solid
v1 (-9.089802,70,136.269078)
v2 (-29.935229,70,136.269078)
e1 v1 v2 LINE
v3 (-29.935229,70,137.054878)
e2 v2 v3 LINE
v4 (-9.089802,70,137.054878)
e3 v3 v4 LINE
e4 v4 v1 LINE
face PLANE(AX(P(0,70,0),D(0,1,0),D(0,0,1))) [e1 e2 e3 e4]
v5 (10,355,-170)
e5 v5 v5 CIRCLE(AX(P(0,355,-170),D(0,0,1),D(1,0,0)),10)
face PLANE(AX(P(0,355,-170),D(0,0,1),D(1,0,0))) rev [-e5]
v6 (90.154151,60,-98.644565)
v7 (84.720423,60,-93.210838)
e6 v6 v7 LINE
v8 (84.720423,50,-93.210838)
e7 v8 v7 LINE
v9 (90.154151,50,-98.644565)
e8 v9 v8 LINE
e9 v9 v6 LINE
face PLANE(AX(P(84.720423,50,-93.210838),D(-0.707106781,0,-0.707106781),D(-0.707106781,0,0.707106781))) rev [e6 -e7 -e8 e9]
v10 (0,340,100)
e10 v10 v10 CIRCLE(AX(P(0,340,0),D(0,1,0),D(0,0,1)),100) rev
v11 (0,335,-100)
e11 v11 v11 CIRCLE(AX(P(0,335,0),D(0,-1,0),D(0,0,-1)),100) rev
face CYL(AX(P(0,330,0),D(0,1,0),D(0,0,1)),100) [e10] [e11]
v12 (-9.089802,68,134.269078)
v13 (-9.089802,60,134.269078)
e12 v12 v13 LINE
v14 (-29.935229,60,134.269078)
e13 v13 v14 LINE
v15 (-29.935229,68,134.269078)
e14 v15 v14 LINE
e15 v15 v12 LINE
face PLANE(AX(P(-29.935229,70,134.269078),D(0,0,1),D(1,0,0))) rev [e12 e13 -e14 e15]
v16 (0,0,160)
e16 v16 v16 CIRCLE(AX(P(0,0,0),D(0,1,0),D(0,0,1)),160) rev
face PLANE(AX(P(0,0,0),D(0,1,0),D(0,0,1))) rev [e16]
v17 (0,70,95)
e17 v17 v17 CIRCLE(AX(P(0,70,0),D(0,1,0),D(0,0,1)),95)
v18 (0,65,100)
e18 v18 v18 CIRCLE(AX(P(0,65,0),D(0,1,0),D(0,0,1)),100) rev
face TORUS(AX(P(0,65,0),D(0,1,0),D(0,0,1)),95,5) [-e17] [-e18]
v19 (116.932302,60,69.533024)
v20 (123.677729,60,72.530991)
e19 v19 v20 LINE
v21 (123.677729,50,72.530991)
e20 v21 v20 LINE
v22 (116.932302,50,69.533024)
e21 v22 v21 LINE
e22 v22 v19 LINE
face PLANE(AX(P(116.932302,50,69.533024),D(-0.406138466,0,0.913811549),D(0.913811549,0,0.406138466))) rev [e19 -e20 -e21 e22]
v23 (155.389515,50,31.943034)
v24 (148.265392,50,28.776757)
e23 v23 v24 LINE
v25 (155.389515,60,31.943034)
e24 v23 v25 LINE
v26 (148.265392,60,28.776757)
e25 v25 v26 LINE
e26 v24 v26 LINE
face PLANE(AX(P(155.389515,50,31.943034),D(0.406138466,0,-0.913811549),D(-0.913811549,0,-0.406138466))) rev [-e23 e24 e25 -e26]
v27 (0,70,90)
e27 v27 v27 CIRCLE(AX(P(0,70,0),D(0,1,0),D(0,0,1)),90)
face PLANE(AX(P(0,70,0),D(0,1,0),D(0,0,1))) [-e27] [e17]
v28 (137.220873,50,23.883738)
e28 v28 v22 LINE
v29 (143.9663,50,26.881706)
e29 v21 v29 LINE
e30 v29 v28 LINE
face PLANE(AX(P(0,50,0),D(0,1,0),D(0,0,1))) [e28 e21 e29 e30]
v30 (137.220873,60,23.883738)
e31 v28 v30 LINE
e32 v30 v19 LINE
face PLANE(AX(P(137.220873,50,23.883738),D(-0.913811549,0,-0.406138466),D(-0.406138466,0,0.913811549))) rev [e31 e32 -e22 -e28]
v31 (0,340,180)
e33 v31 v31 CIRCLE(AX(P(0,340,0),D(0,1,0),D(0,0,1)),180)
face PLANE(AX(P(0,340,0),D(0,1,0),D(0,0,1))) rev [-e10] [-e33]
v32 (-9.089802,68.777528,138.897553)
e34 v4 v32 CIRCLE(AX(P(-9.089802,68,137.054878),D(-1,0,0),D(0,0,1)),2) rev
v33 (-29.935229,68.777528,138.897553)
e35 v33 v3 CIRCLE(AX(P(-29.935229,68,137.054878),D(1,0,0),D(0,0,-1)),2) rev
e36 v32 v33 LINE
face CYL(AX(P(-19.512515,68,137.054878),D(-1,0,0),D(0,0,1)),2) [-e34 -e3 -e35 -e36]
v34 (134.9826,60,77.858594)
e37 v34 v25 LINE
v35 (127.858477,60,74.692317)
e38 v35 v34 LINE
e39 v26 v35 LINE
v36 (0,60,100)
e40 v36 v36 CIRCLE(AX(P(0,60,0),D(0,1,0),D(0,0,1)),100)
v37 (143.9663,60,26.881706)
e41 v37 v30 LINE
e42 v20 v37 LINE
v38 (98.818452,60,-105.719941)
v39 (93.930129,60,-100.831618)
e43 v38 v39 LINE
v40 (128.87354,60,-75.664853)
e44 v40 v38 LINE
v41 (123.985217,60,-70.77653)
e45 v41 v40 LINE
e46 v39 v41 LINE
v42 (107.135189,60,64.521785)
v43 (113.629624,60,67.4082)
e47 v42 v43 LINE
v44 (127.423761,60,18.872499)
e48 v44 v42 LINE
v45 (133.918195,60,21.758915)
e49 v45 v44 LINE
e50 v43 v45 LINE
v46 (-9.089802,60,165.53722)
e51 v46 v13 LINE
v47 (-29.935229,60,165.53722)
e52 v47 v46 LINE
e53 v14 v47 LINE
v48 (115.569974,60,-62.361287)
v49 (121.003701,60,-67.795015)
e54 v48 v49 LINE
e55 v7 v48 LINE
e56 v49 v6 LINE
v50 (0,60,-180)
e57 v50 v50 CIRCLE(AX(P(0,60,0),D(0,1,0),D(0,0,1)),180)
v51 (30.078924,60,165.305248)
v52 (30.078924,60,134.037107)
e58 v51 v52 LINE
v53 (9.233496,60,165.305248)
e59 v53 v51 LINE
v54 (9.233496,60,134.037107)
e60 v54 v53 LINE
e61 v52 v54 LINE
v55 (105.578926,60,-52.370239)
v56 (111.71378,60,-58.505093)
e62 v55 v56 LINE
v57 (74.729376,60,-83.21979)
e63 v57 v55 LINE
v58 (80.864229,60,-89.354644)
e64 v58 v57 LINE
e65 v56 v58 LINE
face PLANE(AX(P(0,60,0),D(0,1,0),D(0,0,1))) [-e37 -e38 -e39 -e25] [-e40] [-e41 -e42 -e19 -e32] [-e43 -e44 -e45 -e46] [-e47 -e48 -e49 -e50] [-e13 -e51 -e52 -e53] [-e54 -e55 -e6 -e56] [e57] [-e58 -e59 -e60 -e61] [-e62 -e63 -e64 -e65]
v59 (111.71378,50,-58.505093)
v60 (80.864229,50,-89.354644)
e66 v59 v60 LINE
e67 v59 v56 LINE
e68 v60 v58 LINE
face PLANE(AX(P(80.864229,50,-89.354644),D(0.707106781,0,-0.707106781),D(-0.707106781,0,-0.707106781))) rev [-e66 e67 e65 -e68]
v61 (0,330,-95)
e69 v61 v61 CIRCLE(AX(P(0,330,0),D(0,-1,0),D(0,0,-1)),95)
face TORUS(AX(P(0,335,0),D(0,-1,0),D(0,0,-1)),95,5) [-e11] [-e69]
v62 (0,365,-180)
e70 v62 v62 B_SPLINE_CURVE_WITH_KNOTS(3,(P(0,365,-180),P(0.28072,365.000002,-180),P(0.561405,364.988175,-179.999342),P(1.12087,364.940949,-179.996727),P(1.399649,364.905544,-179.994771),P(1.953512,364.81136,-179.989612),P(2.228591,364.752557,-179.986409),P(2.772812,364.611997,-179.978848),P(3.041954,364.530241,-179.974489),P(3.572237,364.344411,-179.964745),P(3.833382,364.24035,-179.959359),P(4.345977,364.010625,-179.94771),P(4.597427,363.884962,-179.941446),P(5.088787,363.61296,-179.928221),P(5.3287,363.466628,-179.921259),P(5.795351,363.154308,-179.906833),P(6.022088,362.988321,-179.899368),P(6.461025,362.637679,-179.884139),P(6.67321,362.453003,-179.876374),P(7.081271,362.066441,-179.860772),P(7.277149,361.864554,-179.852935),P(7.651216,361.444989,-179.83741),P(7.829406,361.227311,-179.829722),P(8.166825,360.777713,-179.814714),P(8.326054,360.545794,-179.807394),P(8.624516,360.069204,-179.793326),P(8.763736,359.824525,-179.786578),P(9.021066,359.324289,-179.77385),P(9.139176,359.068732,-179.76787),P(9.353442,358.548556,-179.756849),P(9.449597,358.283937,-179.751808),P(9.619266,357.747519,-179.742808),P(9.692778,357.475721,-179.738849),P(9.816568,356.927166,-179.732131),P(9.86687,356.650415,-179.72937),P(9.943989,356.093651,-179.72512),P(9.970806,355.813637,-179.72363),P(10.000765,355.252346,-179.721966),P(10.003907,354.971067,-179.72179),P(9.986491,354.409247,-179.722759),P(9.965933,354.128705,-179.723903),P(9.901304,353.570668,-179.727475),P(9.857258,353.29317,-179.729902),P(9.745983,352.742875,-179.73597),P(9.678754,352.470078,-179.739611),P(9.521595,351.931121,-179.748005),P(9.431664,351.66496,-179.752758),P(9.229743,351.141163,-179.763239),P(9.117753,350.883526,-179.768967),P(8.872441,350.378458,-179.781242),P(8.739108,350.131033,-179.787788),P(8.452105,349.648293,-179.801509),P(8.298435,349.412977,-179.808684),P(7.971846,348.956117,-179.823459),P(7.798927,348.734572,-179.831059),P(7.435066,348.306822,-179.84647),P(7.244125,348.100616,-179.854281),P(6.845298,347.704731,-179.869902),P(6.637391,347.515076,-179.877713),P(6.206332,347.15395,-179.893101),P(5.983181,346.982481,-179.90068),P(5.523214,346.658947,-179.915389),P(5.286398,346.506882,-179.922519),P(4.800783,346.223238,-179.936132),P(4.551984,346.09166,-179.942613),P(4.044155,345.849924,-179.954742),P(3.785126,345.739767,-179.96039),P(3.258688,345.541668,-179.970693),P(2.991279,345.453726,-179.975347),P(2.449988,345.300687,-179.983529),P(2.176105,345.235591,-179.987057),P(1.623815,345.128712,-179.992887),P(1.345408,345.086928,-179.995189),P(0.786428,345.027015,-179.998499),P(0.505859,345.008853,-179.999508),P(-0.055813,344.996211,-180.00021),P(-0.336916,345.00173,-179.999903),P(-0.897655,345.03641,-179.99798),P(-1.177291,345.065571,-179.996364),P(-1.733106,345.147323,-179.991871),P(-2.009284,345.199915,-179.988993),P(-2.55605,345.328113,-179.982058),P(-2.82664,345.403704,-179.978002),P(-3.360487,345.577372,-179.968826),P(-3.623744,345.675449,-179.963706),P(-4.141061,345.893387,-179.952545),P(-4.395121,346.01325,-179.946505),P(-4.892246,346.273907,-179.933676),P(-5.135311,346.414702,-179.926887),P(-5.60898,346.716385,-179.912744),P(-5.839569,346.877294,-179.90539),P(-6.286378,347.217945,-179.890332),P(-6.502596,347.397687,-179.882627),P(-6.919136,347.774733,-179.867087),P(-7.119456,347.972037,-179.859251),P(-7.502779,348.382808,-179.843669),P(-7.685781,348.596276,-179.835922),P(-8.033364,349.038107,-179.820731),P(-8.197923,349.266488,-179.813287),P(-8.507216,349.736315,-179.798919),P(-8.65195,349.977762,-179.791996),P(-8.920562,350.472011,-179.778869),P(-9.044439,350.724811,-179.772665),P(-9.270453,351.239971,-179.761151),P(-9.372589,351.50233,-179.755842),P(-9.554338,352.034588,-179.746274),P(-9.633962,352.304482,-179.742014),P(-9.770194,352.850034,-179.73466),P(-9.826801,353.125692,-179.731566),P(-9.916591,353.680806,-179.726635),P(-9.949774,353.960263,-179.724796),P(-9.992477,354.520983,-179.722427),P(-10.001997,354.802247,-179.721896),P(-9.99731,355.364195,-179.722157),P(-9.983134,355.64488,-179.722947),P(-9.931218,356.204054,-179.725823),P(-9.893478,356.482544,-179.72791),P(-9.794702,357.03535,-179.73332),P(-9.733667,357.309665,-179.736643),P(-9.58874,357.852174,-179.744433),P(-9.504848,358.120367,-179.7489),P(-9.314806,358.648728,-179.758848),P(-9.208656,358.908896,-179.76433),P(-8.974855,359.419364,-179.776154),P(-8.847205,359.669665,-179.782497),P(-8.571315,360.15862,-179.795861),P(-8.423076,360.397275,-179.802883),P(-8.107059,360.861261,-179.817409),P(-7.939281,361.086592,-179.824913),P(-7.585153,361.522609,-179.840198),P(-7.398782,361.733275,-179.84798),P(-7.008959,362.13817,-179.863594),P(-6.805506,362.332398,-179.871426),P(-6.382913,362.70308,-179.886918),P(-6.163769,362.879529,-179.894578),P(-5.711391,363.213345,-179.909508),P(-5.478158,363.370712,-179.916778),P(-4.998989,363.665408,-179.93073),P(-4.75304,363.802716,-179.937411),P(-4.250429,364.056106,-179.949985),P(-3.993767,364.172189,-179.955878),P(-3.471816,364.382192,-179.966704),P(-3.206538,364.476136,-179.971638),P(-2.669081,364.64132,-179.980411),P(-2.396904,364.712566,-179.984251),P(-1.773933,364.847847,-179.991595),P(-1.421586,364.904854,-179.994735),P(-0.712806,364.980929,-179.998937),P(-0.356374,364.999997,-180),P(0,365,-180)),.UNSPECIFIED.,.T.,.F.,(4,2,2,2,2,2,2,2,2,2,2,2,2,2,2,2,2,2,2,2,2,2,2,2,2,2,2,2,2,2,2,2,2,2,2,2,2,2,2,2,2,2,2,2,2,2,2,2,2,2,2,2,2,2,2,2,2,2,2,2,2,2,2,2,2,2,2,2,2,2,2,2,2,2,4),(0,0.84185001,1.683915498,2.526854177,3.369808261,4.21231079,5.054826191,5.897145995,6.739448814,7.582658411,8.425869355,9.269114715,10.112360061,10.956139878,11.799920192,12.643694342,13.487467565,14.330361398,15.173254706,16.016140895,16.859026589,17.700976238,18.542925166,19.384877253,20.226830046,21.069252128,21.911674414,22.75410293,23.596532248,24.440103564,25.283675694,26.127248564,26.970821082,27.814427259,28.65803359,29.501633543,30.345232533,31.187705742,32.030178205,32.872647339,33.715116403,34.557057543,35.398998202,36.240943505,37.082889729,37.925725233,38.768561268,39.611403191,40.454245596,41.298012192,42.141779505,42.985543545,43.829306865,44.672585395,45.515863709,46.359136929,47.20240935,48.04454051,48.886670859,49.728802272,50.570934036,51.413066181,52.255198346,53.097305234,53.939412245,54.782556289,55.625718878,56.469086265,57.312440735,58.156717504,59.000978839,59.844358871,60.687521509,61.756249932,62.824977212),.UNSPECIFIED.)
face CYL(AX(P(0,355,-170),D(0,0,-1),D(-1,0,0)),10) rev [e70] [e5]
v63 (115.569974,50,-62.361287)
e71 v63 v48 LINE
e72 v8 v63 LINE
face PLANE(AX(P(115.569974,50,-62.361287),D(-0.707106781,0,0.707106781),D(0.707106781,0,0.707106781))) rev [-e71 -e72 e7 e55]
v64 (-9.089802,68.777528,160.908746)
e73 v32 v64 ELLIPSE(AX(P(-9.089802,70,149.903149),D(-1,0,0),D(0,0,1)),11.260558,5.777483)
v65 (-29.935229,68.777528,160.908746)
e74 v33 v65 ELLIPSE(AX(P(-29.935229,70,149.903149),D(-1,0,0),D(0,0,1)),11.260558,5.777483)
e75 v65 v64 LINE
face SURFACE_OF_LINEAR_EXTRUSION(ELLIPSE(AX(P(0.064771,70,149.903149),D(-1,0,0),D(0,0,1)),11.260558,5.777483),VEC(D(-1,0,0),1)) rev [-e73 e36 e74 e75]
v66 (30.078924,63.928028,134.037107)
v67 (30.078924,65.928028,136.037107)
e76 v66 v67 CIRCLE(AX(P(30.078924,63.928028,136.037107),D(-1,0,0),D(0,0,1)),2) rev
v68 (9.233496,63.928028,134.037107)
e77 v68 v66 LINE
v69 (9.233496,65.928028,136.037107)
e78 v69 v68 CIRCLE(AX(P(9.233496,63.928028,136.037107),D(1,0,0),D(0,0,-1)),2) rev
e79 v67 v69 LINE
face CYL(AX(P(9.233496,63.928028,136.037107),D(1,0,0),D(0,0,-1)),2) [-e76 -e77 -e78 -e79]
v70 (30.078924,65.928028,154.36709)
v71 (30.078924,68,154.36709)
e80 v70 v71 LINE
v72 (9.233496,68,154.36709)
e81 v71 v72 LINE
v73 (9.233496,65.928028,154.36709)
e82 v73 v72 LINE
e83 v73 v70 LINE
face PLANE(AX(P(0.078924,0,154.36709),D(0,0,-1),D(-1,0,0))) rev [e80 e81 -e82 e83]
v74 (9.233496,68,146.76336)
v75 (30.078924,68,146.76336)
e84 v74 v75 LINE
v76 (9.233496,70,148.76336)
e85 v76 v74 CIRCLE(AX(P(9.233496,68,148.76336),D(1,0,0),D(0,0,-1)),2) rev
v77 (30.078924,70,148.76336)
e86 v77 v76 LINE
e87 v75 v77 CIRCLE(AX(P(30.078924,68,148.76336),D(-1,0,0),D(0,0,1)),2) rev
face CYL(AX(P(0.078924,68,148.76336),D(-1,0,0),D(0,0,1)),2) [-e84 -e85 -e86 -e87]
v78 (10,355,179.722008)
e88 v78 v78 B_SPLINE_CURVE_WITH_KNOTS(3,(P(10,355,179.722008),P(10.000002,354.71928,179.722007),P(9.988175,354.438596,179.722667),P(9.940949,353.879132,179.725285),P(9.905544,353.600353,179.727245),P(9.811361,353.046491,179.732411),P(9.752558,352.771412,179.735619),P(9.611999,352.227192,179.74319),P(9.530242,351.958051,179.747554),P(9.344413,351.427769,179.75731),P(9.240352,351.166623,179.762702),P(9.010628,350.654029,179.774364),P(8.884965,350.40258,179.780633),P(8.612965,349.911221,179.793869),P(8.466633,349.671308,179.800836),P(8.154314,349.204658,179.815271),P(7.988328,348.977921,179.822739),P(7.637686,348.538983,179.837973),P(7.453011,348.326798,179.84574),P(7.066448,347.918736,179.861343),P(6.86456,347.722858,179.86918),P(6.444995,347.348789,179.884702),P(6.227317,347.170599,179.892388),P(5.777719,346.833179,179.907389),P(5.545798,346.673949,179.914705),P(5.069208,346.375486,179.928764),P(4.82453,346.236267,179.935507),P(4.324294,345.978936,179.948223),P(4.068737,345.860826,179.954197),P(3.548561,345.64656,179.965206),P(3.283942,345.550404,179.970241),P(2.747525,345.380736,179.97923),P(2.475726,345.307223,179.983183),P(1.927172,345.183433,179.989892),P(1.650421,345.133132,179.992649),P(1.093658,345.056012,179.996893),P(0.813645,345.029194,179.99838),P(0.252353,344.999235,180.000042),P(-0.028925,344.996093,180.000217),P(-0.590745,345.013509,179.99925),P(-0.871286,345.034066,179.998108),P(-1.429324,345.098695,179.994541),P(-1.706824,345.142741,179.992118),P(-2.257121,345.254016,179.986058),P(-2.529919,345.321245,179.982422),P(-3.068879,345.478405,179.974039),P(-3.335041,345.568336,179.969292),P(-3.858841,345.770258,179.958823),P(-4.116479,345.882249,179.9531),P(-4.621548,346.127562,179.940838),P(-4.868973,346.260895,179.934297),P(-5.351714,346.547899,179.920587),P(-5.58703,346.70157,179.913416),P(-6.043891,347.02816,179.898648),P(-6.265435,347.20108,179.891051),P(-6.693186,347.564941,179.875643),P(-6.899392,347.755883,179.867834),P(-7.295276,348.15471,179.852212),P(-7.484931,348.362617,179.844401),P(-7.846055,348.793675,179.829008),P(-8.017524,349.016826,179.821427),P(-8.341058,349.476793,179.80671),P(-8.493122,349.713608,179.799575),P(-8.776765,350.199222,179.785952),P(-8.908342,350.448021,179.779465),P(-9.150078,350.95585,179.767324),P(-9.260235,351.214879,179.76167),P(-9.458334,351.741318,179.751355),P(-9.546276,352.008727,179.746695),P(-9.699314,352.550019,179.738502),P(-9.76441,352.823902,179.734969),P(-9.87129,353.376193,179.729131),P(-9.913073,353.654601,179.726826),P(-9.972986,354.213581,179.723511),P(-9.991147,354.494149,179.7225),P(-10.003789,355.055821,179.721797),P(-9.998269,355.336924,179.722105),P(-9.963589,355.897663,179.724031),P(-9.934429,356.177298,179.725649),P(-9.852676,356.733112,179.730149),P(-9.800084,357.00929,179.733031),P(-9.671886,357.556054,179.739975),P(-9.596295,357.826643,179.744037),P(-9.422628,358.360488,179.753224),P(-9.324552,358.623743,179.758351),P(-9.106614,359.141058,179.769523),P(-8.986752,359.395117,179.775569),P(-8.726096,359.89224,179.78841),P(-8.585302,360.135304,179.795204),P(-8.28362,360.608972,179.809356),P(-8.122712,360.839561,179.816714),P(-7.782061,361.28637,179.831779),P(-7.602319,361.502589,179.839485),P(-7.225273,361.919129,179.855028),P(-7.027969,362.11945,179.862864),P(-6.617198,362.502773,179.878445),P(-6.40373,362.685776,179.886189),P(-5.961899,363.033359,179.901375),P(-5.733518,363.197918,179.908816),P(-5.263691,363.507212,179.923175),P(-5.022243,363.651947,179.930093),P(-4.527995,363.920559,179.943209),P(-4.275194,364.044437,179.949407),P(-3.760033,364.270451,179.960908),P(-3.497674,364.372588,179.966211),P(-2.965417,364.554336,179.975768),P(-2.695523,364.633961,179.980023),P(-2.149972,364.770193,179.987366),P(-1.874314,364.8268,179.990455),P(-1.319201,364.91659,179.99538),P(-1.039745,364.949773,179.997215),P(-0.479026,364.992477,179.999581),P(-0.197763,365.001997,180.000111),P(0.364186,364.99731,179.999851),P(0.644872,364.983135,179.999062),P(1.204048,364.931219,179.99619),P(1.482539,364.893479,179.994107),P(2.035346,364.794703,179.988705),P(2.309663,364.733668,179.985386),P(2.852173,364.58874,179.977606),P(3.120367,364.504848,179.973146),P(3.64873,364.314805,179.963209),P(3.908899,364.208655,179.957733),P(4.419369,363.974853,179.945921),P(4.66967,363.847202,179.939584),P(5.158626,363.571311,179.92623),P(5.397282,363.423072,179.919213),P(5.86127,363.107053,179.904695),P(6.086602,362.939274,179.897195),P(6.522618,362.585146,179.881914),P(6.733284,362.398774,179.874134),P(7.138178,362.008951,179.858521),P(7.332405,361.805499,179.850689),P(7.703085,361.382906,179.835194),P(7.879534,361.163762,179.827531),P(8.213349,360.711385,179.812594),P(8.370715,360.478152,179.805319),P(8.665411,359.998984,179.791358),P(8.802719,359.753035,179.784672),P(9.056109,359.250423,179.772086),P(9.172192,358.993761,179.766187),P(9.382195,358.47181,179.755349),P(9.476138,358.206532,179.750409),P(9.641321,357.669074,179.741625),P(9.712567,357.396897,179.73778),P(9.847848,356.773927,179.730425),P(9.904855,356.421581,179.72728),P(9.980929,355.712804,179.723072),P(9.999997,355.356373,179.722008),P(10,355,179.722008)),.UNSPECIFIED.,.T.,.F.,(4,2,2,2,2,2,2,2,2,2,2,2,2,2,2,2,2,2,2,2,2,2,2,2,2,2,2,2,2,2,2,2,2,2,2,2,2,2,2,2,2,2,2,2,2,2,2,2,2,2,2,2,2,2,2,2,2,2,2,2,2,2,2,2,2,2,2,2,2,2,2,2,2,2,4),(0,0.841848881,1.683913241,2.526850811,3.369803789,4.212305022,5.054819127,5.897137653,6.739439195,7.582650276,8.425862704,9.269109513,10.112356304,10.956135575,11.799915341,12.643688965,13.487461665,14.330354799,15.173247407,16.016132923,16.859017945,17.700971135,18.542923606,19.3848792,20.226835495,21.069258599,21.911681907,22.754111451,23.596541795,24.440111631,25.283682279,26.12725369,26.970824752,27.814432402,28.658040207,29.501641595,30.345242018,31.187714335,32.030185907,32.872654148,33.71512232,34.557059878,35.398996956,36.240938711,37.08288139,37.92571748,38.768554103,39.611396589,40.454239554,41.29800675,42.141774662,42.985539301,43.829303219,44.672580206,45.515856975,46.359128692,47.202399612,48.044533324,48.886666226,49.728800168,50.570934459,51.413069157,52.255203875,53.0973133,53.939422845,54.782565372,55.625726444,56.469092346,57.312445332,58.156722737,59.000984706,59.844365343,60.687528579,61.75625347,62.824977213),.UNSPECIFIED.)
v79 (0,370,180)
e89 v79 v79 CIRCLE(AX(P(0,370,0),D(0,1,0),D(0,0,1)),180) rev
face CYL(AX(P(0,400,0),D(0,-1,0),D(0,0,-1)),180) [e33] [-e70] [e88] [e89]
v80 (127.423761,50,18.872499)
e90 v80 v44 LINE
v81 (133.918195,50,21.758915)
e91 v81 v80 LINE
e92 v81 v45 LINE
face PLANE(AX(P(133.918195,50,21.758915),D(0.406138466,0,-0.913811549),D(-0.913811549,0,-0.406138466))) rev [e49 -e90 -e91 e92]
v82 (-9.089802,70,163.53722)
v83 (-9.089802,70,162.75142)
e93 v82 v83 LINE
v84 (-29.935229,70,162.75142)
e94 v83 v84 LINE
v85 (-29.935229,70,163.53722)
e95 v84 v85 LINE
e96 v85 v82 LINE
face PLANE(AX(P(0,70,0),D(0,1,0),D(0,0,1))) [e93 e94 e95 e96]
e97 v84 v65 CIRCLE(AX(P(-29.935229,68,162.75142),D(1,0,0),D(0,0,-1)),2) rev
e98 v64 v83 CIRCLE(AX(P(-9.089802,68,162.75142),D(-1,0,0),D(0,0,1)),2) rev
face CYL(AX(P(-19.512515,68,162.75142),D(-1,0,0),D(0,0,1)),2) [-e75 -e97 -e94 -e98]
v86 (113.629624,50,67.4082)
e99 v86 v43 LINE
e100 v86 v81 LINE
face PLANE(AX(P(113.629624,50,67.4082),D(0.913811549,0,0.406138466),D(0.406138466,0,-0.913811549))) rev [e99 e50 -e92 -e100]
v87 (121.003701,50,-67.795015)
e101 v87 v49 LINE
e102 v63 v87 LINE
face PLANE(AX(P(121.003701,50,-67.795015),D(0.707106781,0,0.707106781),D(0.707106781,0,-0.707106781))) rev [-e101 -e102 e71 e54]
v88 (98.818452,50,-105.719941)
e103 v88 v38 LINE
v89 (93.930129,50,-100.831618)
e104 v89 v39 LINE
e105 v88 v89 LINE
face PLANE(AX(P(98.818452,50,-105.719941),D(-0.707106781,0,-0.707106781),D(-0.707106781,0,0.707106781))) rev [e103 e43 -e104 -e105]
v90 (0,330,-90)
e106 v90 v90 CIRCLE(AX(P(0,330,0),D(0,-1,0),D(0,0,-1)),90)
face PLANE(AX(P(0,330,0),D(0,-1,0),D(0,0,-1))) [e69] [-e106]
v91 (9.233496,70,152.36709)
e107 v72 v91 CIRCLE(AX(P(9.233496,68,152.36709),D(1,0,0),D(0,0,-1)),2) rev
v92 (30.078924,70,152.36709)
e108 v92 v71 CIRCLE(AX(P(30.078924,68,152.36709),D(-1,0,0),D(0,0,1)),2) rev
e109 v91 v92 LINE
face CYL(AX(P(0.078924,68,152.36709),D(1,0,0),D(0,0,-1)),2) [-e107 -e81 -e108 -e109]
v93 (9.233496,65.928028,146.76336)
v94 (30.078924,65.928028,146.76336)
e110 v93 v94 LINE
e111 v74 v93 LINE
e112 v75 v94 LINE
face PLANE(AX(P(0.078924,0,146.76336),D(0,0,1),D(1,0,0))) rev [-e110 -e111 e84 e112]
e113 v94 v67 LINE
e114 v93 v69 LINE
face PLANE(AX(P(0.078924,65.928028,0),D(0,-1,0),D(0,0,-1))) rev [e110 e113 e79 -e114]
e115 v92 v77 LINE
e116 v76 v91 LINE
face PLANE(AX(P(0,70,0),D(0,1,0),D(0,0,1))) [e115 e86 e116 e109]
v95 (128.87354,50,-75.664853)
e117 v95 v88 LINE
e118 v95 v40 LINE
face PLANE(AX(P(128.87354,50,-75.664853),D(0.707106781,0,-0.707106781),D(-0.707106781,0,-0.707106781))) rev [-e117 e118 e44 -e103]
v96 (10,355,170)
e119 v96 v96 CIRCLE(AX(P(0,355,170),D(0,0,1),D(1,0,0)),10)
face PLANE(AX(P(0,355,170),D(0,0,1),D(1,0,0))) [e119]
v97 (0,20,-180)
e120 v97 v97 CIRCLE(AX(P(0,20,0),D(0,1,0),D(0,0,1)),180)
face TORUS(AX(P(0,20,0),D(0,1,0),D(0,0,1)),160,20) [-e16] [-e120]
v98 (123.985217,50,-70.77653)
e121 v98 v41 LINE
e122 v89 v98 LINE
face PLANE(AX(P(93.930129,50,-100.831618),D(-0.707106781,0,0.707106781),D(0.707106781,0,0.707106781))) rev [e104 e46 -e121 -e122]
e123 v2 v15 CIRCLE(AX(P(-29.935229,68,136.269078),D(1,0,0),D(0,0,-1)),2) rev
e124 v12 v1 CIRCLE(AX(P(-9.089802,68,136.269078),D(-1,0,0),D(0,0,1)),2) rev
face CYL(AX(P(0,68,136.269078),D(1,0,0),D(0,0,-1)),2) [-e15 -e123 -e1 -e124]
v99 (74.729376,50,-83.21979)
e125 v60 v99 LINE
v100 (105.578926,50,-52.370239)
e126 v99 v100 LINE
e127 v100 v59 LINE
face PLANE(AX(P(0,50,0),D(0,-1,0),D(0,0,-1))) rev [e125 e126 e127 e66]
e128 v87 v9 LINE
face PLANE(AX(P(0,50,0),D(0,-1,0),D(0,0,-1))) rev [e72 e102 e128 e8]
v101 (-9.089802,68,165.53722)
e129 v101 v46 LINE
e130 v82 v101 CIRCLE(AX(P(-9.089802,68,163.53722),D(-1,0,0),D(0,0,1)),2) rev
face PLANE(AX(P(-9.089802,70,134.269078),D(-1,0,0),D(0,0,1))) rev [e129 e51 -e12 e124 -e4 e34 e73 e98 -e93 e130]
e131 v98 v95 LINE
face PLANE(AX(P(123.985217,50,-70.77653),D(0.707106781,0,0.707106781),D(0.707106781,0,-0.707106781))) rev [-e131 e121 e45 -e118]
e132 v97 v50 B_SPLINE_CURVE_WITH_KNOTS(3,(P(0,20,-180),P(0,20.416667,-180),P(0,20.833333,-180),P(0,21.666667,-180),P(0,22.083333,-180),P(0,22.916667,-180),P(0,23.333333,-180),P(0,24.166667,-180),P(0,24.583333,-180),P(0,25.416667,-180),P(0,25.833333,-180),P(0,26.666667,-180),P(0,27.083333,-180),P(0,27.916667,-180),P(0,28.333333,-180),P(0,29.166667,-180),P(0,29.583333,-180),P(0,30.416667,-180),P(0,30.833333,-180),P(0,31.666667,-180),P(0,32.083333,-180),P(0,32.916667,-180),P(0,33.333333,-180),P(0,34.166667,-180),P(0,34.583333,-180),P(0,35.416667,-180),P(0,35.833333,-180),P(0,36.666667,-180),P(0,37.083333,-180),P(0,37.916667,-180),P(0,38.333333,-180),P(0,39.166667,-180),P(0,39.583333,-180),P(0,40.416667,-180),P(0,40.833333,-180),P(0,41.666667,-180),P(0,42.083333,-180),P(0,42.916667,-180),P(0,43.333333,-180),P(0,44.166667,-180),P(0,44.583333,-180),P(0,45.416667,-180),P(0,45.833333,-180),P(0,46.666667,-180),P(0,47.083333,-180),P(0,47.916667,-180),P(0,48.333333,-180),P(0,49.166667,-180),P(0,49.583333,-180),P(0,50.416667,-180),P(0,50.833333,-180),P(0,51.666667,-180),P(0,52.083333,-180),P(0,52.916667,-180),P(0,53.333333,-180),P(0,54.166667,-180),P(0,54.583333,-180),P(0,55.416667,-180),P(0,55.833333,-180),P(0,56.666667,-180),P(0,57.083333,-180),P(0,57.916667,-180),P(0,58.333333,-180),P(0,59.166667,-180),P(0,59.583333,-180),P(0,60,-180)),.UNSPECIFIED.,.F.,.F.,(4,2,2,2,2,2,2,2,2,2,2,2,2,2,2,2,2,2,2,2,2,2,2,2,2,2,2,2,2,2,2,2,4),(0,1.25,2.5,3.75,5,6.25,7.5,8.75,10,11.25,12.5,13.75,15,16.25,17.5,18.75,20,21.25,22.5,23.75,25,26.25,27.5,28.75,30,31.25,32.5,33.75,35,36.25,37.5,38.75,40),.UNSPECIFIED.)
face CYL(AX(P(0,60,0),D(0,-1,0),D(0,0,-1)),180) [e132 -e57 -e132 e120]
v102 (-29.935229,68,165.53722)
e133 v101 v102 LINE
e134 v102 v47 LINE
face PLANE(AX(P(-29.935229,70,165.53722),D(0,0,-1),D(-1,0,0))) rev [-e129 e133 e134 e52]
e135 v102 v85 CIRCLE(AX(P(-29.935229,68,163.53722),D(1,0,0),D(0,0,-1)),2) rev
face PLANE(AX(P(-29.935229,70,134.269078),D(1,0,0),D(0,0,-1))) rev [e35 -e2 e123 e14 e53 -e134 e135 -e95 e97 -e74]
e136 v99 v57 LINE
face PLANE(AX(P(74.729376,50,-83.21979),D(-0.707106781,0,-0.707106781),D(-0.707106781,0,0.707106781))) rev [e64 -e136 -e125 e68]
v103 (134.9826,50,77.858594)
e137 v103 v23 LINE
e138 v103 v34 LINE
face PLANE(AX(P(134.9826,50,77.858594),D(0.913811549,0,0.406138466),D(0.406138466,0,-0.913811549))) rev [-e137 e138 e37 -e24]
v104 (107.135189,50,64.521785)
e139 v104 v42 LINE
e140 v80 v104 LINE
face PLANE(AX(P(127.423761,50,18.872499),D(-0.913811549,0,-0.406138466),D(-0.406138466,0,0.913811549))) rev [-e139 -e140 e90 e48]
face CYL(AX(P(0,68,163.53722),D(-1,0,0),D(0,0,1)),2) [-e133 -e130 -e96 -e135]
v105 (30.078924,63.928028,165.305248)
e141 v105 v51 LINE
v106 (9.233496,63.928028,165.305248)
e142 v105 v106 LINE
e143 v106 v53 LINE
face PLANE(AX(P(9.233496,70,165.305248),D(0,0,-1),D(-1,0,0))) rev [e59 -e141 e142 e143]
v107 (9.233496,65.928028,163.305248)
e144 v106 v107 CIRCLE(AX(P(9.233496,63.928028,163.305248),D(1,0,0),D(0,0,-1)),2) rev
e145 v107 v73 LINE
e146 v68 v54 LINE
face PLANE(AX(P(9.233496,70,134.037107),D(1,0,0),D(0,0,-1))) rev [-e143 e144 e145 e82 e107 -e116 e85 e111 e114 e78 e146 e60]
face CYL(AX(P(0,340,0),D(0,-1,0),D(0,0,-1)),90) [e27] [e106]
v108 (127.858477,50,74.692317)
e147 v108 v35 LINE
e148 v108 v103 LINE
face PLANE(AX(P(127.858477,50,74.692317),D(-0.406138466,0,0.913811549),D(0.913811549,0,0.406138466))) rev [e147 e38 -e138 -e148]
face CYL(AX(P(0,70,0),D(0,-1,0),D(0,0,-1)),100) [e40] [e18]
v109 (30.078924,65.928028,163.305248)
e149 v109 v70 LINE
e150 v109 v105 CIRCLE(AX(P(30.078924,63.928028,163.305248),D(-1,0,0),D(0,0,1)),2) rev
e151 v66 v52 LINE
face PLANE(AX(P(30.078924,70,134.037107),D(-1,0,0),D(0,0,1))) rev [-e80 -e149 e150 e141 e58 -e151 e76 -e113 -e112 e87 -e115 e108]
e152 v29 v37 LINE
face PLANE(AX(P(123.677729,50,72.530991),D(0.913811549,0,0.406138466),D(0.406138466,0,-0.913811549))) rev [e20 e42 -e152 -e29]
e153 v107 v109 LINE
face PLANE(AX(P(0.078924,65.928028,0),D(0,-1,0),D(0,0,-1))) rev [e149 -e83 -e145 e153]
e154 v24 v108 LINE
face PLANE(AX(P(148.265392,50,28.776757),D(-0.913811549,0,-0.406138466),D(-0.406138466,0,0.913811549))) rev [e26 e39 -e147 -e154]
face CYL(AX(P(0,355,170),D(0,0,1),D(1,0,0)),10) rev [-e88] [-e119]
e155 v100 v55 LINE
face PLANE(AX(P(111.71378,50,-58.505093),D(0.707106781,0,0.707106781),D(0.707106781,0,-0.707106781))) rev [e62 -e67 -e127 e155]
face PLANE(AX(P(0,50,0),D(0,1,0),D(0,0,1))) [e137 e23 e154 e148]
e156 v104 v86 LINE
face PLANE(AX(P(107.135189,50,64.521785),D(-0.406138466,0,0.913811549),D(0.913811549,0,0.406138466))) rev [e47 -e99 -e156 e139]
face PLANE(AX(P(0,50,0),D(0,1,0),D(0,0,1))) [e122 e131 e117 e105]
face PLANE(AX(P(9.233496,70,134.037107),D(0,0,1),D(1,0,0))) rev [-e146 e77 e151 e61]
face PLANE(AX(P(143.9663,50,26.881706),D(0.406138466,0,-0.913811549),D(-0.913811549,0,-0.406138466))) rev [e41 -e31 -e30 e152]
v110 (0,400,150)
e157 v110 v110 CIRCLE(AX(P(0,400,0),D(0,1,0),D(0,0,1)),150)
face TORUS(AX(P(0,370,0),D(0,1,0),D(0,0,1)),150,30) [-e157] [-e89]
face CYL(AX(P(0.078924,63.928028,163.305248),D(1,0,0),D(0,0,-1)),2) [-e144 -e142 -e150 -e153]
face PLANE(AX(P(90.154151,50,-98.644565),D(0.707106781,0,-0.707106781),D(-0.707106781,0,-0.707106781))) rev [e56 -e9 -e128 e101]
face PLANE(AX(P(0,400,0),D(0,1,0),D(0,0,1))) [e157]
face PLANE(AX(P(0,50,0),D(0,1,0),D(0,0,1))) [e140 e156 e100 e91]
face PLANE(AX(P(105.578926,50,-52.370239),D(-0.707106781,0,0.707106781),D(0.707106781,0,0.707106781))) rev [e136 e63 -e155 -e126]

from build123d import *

# Parameters (mm, degrees)
SKETCH1_R           = 180
BOSS_EXTRUDE1_DEPTH = 60
FILLET1_R           = 20
SKETCH2_R           = 100
BOSS_EXTRUDE3_DEPTH = 10
SKETCH3_R           = 90
BOSS_EXTRUDE4_DEPTH = 270
SKETCH4_R           = 180
BOSS_EXTRUDE5_DEPTH = 60
FILLET2_R           = 30
BOSS_EXTRUDE6_START = 10
SKETCH6_R           = 100
BOSS_EXTRUDE6_DEPTH = 10
FILLET3_R           = 5
SKETCH9_W           = 20.845427705
SKETCH9_H           = 31.268141557
BOSS_EXTRUDE7_DEPTH = 10
SKETCH10_R          = 10
CUT_EXTRUDE2_DEPTH  = 10
CUT_EXTRUDE3_START  = 10
SKETCH12_R          = 10
CUT_EXTRUDE3_DEPTH  = 10
SKETCH13_RX         = 11.260558061
SKETCH13_RY         = 5.777483036
CUT_EXTRUDE4_DEPTH  = 30
SKETCH14_W          = 10.93815799
SKETCH14_H          = 4.07197177
SKETCH14_W_2        = 12.726253657
CUT_EXTRUDE5_DEPTH  = 30
FILLET4_START       = -31
FILLET4_DEPTH       = 62
FILLET4_START_2     = -9.089801569
FILLET4_2_DEPTH     = 40.089801569
CUT_EXTRUDE6_DEPTH  = 10
CUT_EXTRUDE7_DEPTH  = 10


with BuildPart() as part:
    # Sketch1 → Boss-Extrude1 (new body)
    with BuildSketch(Plane(origin=(0, 0, 0), x_dir=(1, 0, 0), z_dir=(0, 1, 0))):
        with Locations(Location((0, 0, 0), (0, 0, 90))):
            Circle(SKETCH1_R)
    extrude(amount=BOSS_EXTRUDE1_DEPTH)

    # Fillet1
    fillet1_edges = [part.edges().sort_by_distance(p)[0] for p in [
        (0, 0, 180),
    ]]
    fillet(fillet1_edges, radius=FILLET1_R)

    # Sketch2 → Boss-Extrude3 (add)
    with BuildSketch(Plane(origin=(0, 60, 0), x_dir=(1, 0, 0), z_dir=(0, 1, 0))):
        with Locations(Location((0, 0, 0), (0, 0, 270))):
            Circle(SKETCH2_R)
    extrude(amount=BOSS_EXTRUDE3_DEPTH)

    # Sketch3 → Boss-Extrude4 (add)
    with BuildSketch(Plane(origin=(0, 70, 0), x_dir=(1, 0, 0), z_dir=(0, 1, 0))):
        with Locations(Location((0, 0, 0), (0, 0, 270))):
            Circle(SKETCH3_R)
    extrude(amount=BOSS_EXTRUDE4_DEPTH)

    # Sketch4 → Boss-Extrude5 (add)
    with BuildSketch(Plane(origin=(0, 340, 0), x_dir=(1, 0, 0), z_dir=(0, 1, 0))):
        with Locations(Location((0, 0, 0), (0, 0, 90))):
            Circle(SKETCH4_R)
    extrude(amount=BOSS_EXTRUDE5_DEPTH)

    # Fillet2
    fillet2_edges = [part.edges().sort_by_distance(p)[0] for p in [
        (0, 400, 180),
    ]]
    fillet(fillet2_edges, radius=FILLET2_R)

    # Sketch6 → Boss-Extrude6 (add)
    with BuildSketch(Plane.XZ.offset(-340).offset(BOSS_EXTRUDE6_START)):
        with Locations(Location((0, 0, 0), (0, 0, 90))):
            Circle(SKETCH6_R)
    extrude(amount=-BOSS_EXTRUDE6_DEPTH)

    # Fillet3
    fillet3_edges = [part.edges().sort_by_distance(p)[0] for p in [
        (0, 330, -100),
        (0, 70, -100),
    ]]
    fillet(fillet3_edges, radius=FILLET3_R)

    # Sketch9 → Boss-Extrude7 (add)
    with BuildSketch(Plane(origin=(0, 60, 0), x_dir=(1, 0, 0), z_dir=(0, 1, 0))):
        with Locations((-19.512515422, -149.90314923)):
            Rectangle(SKETCH9_W, SKETCH9_H)
        with Locations((19.656209668, -149.671177345)):
            Rectangle(SKETCH9_W, SKETCH9_H)
    extrude(amount=BOSS_EXTRUDE7_DEPTH)

    # Sketch10 → Cut-Extrude2 (cut)
    with BuildSketch(Plane.XY.offset(180)):
        with Locations((0, 355)):
            Circle(SKETCH10_R)
    extrude(amount=-CUT_EXTRUDE2_DEPTH, mode=Mode.SUBTRACT)

    # Sketch12 → Cut-Extrude3 (cut)
    with BuildSketch(Plane.XY.offset(-180).offset(CUT_EXTRUDE3_START)):
        with Locations((0, 355)):
            Circle(SKETCH12_R)
    extrude(amount=-CUT_EXTRUDE3_DEPTH, mode=Mode.SUBTRACT)

    # Sketch13 → Cut-Extrude4 (cut)
    with BuildSketch(Plane.ZY.offset(29.935229274)):
        with Locations((149.903149231, 70)):
            Ellipse(SKETCH13_RX, SKETCH13_RY)
    extrude(amount=-CUT_EXTRUDE4_DEPTH, mode=Mode.SUBTRACT)

    # Sketch14 → Cut-Extrude5 (cut)
    with BuildSketch(Plane(origin=(30.07892352, 0, 0), x_dir=(0, 0, -1), z_dir=(1, 0, 0))):
        with Locations((-159.836169129, 67.964014115)):
            Rectangle(SKETCH14_W, SKETCH14_H)
        with Locations((-140.400233395, 67.964014115)):
            Rectangle(SKETCH14_W_2, SKETCH14_H)
    extrude(amount=-CUT_EXTRUDE5_DEPTH, mode=Mode.SUBTRACT)

    # Fillet4: read off the stored shape, not the designer's step
    # Fillet4 outline → Fillet4 (cut)
    with BuildSketch(Plane.YZ.offset(FILLET4_START)):
        with BuildLine():
            Line((70, 165.537220009), (68, 165.537220009))
            ThreePointArc((68, 165.537220009), (69.414213562, 164.951433572), (70, 163.537220009))
            Line((70, 163.537220009), (70, 165.537220009))
        make_face()
        with BuildLine():
            Line((70, 161.163707292), (70, 162.751420247))
            ThreePointArc((70, 162.751420247), (69.666591866, 161.645765891), (68.777528446, 160.908745692))
            add(Edge.make_bspline(
                [(68.777528446, 160.908745692), (69.381765186, 161.163707292), (70, 161.163707292)],
                knots=[6.055563227, 6.055563227, 6.055563227, 6.283185307, 6.283185307, 6.283185307], degree=2, weights=[0.927415097, 0.957557219, 1]))
        make_face()
        with BuildLine():
            Line((70, 154.367090134), (68, 154.367090134))
            ThreePointArc((68, 154.367090134), (69.414213562, 153.781303696), (70, 152.367090134))
            Line((70, 152.367090134), (70, 154.367090134))
        make_face()
        with BuildLine():
            add(Edge.make_bspline(
                [(70, 138.642591169), (69.381765186, 138.642591169), (68.777528446, 138.897552769)],
                knots=[3.141592654, 3.141592654, 3.141592654, 3.369214734, 3.369214734, 3.369214734], degree=2, weights=[1, 0.957557219, 0.927415097]))
            ThreePointArc((68.777528446, 138.897552769), (69.666591866, 138.16053257), (70, 137.054878214))
            Line((70, 137.054878214), (70, 138.642591169))
        make_face()
        with BuildLine():
            ThreePointArc((70, 148.763360224), (69.414213562, 147.349146661), (68, 146.763360224))
            Line((68, 146.763360224), (70, 146.763360224))
            Line((70, 146.763360224), (70, 148.763360224))
        make_face()
        with BuildLine():
            Line((65.92802823, 134.269078452), (64.862948862, 134.269078452))
            ThreePointArc((64.862948862, 134.269078452), (64.409662828, 134.095965635), (63.92802823, 134.037106567))
            Line((63.92802823, 134.037106567), (65.92802823, 134.037106567))
            Line((65.92802823, 134.037106567), (65.92802823, 134.269078452))
        make_face()
        with BuildLine():
            ThreePointArc((70, 136.269078452), (69.414213562, 134.85486489), (68, 134.269078452))
            Line((68, 134.269078452), (70, 134.269078452))
            Line((70, 134.269078452), (70, 136.269078452))
        make_face()
    extrude(amount=FILLET4_DEPTH, mode=Mode.SUBTRACT)

    # Fillet4 2 outline → Fillet4 2 (cut)
    with BuildSketch(Plane.YZ.offset(FILLET4_START_2)):
        with BuildLine():
            ThreePointArc((63.92802823, 165.305248124), (65.342241792, 164.719461686), (65.92802823, 163.305248124))
            Line((65.92802823, 163.305248124), (65.92802823, 165.305248124))
            Line((65.92802823, 165.305248124), (63.92802823, 165.305248124))
        make_face()
        with BuildLine():
            Line((65.92802823, 134.269078452), (65.92802823, 136.037106567))
            ThreePointArc((65.92802823, 136.037106567), (65.641189236, 135.005079741), (64.862948862, 134.269078452))
            Line((64.862948862, 134.269078452), (65.92802823, 134.269078452))
        make_face()
    extrude(amount=FILLET4_2_DEPTH, mode=Mode.SUBTRACT)

    # Sketch22 → Cut-Extrude6 (cut)
    with BuildSketch(Plane(origin=(0, 60, 0), x_dir=(1, 0, 0), z_dir=(0, 1, 0))):
        Polygon((127.423760752, -18.872499432), (107.1351894, -64.521784974), (113.629623838, -67.40820028), (133.91819519, -21.758914738), align=None)
        Polygon((137.220873331, -23.883738258), (116.932301979, -69.5330238), (123.677729052, -72.530991388), (143.966300404, -26.881705846), align=None)
        Polygon((148.265392154, -28.776757418), (127.858476847, -74.692316859), (134.98259987, -77.858593758), (155.389515177, -31.943034317), align=None)
    extrude(amount=-CUT_EXTRUDE6_DEPTH, mode=Mode.SUBTRACT)

    # Sketch24 → Cut-Extrude7 (cut)
    with BuildSketch(Plane(origin=(0, 60, 0), x_dir=(1, 0, 0), z_dir=(0, 1, 0))):
        Polygon((111.713779985, 58.505093082), (105.578926162, 52.370239259), (74.729375507, 83.219789913), (80.86422933, 89.354643737), align=None)
        Polygon((115.569973817, 62.361286914), (84.720423162, 93.210837569), (90.154150834, 98.644565241), (121.003701489, 67.795014586), align=None)
        Polygon((93.930128704, 100.831618279), (123.985216943, 70.77653004), (128.873539941, 75.664853038), (98.818451702, 105.719941277), align=None)
    extrude(amount=-CUT_EXTRUDE7_DEPTH, mode=Mode.SUBTRACT)


solid = part.part
